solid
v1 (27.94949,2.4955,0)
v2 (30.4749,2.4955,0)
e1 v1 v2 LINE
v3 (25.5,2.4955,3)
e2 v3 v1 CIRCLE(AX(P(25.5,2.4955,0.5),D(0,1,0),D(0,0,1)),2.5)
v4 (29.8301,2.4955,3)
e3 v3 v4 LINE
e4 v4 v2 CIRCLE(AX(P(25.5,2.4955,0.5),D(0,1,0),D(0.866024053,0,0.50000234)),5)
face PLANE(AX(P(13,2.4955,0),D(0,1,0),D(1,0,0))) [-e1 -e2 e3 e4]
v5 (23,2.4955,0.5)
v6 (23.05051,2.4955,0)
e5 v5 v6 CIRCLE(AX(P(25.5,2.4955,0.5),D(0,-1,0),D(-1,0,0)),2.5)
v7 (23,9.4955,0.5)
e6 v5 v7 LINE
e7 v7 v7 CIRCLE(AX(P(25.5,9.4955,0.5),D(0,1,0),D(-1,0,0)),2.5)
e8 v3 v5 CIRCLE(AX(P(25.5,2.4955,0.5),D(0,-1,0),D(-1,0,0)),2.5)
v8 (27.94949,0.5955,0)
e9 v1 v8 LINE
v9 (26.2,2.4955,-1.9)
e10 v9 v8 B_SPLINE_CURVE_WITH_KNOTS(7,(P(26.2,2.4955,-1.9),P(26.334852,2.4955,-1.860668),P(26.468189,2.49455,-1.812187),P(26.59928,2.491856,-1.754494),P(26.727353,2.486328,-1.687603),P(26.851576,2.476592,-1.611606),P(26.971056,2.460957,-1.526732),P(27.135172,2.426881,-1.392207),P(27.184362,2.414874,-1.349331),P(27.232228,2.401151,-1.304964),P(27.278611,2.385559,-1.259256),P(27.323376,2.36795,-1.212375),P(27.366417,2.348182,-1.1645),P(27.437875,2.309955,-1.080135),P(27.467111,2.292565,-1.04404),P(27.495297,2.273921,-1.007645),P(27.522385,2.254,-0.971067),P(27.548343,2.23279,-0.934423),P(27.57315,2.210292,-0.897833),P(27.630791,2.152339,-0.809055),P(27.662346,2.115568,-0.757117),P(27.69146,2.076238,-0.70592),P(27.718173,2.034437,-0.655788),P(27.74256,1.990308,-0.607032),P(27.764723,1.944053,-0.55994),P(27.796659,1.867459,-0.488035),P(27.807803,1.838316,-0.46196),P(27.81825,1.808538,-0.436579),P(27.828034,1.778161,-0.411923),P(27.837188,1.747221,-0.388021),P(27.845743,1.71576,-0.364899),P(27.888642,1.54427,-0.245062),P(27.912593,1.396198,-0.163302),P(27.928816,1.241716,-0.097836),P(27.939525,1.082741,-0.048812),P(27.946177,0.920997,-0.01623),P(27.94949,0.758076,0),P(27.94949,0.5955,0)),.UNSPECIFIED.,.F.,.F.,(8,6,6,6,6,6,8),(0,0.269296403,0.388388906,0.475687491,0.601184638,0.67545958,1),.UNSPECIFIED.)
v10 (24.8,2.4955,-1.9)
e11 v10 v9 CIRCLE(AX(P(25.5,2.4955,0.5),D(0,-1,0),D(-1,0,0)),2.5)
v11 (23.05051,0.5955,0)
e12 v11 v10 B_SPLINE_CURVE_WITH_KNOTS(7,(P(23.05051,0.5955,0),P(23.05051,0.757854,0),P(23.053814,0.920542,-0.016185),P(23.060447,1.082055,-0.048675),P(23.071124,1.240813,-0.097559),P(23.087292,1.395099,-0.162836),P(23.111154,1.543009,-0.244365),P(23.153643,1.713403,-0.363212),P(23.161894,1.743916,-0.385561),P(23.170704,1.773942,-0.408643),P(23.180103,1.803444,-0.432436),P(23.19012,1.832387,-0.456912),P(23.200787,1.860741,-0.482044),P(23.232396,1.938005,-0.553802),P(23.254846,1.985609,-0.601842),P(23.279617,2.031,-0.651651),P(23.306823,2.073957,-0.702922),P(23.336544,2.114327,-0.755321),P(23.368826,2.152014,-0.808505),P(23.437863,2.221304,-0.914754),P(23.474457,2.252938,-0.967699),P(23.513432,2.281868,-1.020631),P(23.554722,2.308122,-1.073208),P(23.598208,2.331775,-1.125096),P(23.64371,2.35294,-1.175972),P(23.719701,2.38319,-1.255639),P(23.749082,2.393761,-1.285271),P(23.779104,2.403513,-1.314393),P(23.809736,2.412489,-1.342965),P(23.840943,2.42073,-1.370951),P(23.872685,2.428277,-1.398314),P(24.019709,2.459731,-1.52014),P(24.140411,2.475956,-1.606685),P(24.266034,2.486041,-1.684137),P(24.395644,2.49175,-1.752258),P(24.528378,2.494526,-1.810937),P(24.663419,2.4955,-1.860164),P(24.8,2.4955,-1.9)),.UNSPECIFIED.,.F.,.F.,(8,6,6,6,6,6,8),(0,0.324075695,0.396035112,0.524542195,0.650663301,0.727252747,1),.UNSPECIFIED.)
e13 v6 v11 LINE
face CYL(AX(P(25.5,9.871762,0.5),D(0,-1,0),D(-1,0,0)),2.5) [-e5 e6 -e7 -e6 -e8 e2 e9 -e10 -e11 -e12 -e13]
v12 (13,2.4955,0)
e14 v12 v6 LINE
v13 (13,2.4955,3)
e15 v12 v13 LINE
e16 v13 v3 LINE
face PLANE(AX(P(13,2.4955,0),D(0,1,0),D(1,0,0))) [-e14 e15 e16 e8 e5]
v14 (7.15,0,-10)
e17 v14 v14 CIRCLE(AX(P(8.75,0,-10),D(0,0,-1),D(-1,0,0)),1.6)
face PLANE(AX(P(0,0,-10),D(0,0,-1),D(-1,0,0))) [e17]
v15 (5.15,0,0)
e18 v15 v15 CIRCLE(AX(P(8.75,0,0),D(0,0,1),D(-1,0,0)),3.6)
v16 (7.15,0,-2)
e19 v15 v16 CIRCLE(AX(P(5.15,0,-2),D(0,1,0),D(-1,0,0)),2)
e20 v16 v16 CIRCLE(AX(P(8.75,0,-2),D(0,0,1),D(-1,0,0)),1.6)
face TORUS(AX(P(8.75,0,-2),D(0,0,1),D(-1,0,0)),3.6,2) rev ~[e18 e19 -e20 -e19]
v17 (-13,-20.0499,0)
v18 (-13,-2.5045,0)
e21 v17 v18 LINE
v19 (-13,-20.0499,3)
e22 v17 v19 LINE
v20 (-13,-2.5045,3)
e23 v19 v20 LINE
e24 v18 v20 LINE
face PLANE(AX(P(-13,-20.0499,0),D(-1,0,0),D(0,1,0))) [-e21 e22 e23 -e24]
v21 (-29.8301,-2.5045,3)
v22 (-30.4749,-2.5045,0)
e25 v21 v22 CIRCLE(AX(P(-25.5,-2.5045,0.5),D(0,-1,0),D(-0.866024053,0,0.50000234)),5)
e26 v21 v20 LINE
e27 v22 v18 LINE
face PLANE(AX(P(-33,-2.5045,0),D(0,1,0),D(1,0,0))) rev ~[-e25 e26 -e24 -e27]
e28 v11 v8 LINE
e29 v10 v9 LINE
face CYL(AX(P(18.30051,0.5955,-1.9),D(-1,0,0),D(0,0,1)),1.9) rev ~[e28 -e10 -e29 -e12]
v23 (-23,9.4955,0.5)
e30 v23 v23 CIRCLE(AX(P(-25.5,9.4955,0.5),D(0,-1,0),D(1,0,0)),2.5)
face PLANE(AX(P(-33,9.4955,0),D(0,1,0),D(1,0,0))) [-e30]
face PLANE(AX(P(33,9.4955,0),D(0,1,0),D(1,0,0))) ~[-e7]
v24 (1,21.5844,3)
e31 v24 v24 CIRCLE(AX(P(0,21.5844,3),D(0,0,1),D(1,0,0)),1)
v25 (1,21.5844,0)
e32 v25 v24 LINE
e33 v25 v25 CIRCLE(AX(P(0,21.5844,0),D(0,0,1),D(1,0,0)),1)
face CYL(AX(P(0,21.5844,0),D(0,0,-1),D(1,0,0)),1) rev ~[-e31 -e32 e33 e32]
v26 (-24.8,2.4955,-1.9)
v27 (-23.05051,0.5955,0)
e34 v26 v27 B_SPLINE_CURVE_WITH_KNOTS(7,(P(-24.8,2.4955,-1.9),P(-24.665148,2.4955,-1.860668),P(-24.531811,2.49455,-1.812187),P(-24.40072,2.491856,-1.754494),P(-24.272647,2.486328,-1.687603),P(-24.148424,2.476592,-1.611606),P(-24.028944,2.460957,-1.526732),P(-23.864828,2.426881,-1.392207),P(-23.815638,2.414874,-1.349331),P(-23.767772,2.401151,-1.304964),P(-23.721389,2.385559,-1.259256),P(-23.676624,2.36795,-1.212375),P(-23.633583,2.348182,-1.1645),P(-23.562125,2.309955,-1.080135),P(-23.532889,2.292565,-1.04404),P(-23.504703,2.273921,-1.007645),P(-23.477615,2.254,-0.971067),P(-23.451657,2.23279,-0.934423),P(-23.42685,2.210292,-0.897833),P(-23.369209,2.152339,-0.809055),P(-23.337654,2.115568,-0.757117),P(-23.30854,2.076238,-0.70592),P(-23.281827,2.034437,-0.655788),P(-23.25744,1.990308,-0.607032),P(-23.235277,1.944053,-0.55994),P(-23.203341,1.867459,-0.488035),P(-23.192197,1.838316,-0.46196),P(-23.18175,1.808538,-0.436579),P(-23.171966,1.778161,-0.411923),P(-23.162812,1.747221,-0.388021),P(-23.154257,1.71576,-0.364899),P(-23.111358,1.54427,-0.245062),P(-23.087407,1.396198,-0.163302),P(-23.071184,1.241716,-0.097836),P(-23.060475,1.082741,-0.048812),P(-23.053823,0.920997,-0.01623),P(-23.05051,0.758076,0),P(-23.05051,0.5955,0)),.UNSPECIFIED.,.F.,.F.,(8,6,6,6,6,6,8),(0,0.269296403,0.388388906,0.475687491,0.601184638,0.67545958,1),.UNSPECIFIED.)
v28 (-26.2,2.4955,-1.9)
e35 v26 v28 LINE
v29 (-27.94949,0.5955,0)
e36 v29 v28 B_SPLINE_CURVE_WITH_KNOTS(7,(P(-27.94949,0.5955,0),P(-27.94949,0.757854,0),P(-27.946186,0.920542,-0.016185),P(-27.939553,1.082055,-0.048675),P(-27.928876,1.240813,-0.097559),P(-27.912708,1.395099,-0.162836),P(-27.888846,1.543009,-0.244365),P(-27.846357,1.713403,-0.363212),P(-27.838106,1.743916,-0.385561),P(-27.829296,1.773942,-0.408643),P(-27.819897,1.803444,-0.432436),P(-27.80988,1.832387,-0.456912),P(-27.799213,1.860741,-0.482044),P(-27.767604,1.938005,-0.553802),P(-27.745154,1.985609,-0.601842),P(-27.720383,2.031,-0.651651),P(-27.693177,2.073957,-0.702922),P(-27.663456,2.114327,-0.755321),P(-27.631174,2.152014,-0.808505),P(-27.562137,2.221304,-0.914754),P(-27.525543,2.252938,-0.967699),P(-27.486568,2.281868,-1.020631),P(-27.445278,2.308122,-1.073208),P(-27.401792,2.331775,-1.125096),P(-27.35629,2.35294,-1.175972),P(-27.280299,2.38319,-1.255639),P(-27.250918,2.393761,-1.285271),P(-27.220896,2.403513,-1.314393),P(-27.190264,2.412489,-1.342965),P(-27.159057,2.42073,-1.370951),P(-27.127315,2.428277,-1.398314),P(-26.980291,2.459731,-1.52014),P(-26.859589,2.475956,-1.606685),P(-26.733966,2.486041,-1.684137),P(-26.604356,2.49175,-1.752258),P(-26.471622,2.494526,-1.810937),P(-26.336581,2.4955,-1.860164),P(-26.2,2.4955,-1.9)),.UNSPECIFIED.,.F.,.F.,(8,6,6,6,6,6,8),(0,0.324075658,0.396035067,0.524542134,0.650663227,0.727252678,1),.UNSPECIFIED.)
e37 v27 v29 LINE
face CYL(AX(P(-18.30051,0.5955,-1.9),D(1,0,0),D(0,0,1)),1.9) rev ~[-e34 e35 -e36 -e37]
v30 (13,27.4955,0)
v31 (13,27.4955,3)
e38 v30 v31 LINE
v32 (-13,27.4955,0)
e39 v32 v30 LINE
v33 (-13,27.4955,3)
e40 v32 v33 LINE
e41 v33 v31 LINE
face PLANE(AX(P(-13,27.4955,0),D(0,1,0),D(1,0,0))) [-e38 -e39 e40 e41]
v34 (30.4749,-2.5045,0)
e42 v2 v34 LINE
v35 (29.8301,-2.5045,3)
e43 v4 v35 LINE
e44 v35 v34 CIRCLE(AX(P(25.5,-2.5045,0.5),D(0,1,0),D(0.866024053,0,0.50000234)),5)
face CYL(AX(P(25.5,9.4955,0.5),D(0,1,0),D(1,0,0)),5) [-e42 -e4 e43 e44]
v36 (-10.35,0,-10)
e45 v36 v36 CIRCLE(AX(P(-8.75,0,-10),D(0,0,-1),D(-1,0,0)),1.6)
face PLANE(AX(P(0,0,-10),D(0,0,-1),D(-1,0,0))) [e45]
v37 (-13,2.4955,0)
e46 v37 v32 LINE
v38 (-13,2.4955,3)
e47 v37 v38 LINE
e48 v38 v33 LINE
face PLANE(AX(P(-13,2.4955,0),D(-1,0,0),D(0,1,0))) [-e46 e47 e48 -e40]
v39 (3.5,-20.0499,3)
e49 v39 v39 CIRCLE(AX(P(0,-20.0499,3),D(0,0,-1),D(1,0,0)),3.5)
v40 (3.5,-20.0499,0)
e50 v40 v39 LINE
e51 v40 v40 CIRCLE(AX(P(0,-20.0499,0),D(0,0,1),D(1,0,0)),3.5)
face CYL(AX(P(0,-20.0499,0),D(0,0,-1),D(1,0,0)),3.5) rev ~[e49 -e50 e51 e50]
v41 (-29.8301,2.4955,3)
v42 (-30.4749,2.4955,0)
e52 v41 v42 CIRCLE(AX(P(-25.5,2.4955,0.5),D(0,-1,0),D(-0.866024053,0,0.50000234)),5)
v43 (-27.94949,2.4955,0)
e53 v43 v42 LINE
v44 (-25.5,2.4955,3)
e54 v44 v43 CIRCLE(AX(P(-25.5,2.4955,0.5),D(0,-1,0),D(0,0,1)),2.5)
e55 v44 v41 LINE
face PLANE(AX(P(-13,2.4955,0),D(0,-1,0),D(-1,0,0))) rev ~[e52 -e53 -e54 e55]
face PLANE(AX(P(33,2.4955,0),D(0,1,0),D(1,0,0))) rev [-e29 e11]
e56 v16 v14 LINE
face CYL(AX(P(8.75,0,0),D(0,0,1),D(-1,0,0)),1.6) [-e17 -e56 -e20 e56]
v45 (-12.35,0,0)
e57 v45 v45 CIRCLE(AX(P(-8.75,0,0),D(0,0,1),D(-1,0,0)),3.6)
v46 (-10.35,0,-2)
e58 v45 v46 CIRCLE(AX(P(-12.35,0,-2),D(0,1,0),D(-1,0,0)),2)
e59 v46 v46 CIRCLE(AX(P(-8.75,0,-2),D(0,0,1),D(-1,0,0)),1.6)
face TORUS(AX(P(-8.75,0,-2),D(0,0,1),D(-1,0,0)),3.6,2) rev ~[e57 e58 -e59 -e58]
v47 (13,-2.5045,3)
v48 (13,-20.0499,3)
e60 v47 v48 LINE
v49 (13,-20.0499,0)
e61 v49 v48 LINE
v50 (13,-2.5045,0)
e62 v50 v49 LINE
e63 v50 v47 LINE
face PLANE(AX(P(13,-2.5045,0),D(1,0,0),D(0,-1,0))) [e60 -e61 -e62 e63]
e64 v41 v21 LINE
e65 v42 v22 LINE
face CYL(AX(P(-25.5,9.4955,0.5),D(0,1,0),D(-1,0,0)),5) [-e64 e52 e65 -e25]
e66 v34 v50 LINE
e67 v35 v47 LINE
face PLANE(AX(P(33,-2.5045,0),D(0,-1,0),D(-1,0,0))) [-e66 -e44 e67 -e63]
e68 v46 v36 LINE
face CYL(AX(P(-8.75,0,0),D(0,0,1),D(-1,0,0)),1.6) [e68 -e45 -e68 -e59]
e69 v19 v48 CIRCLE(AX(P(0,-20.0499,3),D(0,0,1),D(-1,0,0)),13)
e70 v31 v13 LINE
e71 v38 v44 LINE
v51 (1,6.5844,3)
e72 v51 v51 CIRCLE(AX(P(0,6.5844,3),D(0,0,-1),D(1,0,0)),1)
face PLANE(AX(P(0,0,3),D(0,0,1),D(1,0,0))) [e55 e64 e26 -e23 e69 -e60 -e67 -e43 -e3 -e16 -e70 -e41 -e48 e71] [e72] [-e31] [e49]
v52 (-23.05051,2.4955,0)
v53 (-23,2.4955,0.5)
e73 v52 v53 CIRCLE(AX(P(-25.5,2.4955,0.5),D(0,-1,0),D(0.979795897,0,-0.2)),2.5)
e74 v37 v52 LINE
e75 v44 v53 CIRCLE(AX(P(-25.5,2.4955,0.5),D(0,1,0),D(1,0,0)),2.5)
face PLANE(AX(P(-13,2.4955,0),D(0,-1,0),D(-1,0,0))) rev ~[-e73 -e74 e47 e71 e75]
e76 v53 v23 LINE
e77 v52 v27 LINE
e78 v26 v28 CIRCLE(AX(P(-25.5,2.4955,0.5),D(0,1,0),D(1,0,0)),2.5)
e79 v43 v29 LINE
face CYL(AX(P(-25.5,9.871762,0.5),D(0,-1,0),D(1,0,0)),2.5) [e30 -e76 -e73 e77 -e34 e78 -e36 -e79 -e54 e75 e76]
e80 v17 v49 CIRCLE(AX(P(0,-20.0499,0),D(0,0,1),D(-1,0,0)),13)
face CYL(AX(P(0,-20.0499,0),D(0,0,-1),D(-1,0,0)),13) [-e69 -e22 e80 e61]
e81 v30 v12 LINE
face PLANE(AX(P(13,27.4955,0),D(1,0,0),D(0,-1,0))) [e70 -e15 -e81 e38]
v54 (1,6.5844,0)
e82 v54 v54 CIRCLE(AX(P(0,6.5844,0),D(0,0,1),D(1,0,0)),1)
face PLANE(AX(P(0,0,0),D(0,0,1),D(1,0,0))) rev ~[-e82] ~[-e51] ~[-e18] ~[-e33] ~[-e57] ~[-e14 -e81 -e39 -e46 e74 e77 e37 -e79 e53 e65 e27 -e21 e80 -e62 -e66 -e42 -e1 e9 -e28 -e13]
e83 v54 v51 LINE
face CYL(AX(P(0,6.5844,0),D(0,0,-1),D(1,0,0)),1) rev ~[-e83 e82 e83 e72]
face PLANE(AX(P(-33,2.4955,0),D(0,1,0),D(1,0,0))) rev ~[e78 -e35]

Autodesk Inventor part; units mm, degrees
ref_plane "YZ Plane" through (0, 0, 0) normal (1, 0, 0) x (0, 1, 0)
ref_plane "XZ Plane" through (0, 0, 0) normal (0, 1, 0) x (-1, 0, 0)
ref_plane "XY Plane" through (0, 0, 0) normal (0, 0, 1) x (1, 0, 0)
sketch "Sketch1" plane through (0, 0, 0) normal (0, 0, 1) x (1, 0, 0)
  line L0 (0, 8.9678) -> (0, -21.984)
  line L1 (-55.9342, 0) -> (8.6032, 0)
  circle A0 centre (-8.75, 0) radius 1.6
  circle A1 centre (8.75, 0) radius 1.6
  line L2 (-13, 27.4955) -> (13, 27.4955)
  line L3 (13, 27.4955) -> (13, -20.0499)
  line L4 (-13, -20.0499) -> (-13, 27.4955)
  circle A2 centre (0, 21.5844) radius 1
  circle A3 centre (0, 6.5844) radius 1
  circle A4 centre (0, -20.0499) radius 3.5
  line L5 (0, -20.0499) -> (8.75, 0)
  arc A5 (-13, -20.0499) -> (13, -20.0499) centre (0, -20.0499) ccw
  line L6 (-13, 2.4955) -> (-33, 2.4955)
  line L7 (-33, 2.4955) -> (-33, -2.5045)
  line L8 (-33, -2.5045) -> (-13, -2.5045)
  line L9 (13, 2.4955) -> (33, 2.4955)
  line L10 (33, 2.4955) -> (33, -2.5045)
  line L11 (33, -2.5045) -> (13, -2.5045)
  point P0 (0, 0)
  point P1 (-13, -2.5045)
  dimension "d1" = 17.5
  dimension "d2" = 3.2
  dimension "d3" = 15
  dimension "d4" = 2
  dimension "d7" = 26
  dimension "d8" = 7
  dimension "d9" = 21.876
  dimension "d14" = 5
  dimension "d15" = 20
  dimension "d22" = 25
extrude "Extrusion1" add sketch "Sketch1" along normal blind 3 contours L1 A1 L5 A4 L0 | L7 L6 L4 L1 | L1 L4 L8 L7 | L4 L2 L3 A5 | L3 L9 L10 L11
sketch "Sketch2" plane through (0, 0, 0) normal (0, 0, -1) x (-1, 0, 0)
  circle A0 centre (-8.75, 0) radius 1.6 projected
  circle A1 centre (-8.75, 0) radius 1.6
  circle A2 centre (8.75, 0) radius 1.6 projected
  circle A3 centre (8.75, 0) radius 1.6
  point P0 (0, 0)
extrude "Extrusion2" add sketch "Sketch2" along normal blind 10 and the other way blind 3
sketch "Sketch3" plane through (-33, 2.4955, 0) normal (0, 1, 0) x (1, 0, 0)
  circle A0 centre (7.5, -0.5) radius 2.5
  line L0 (20, 0) -> (0, 0) projected
  line L1 (0, 0) -> (0, -3) projected
  line L2 (0.0505, -3) -> (0, -3)
  line L3 (0, -3) -> (0, 0)
  line L4 (0, 0) -> (9.9495, 0)
  line L5 (20, -3) -> (0, -3) projected
  point P0 (33, 0)
  point P1 (5.1646, -1.3921)
  dimension "d16" = 5
  dimension "d26" = 7.5
extrude "Extrusion3" add sketch "Sketch3" along normal blind 7 contours A0 L0 | L0 A0
fillet "Fillet1" radius 2 2 edges at (10.35, 0, 0) (-7.15, 0, 0)
fillet "Fillet2" radius 1.9 1 edges at (-25.5, 2.4955, 0)
mirror "Mirror1" about plane through (0, 0, 0) normal (1, 0, 0) of "Extrusion3"
mirror "Mirror3" about plane through (0, 0, 0) normal (1, 0, 0) of "Fillet2"
sketch "Sketch5" plane through (25.5, 9.4955, 0.5) normal (0, 1, 0) x (1, 0, 0)
  circle A0 centre (0, 0) radius 5
  line L0 (-12.5, -2.5) -> (7.5, -2.5) projected
  line L1 (4.3301, -2.5) -> (9.1307, -2.5)
  line L2 (9.1307, -2.5) -> (9.1307, 0.5)
  line L3 (9.1307, 0.5) -> (4.9749, 0.5)
  line L4 (-12.5, 0.5) -> (7.5, 0.5) projected
  point P0 (-25.5, 0.5)
  dimension "d27" = 10
extrude "Extrusion5" cut sketch "Sketch5" against normal up to surface (12 mm away) contours A0 L3 L2 L1 L0
mirror "Mirror4" about plane through (0, 0, 0) normal (1, 0, 0) of "Extrusion5"
properties part number "pintutucu"
